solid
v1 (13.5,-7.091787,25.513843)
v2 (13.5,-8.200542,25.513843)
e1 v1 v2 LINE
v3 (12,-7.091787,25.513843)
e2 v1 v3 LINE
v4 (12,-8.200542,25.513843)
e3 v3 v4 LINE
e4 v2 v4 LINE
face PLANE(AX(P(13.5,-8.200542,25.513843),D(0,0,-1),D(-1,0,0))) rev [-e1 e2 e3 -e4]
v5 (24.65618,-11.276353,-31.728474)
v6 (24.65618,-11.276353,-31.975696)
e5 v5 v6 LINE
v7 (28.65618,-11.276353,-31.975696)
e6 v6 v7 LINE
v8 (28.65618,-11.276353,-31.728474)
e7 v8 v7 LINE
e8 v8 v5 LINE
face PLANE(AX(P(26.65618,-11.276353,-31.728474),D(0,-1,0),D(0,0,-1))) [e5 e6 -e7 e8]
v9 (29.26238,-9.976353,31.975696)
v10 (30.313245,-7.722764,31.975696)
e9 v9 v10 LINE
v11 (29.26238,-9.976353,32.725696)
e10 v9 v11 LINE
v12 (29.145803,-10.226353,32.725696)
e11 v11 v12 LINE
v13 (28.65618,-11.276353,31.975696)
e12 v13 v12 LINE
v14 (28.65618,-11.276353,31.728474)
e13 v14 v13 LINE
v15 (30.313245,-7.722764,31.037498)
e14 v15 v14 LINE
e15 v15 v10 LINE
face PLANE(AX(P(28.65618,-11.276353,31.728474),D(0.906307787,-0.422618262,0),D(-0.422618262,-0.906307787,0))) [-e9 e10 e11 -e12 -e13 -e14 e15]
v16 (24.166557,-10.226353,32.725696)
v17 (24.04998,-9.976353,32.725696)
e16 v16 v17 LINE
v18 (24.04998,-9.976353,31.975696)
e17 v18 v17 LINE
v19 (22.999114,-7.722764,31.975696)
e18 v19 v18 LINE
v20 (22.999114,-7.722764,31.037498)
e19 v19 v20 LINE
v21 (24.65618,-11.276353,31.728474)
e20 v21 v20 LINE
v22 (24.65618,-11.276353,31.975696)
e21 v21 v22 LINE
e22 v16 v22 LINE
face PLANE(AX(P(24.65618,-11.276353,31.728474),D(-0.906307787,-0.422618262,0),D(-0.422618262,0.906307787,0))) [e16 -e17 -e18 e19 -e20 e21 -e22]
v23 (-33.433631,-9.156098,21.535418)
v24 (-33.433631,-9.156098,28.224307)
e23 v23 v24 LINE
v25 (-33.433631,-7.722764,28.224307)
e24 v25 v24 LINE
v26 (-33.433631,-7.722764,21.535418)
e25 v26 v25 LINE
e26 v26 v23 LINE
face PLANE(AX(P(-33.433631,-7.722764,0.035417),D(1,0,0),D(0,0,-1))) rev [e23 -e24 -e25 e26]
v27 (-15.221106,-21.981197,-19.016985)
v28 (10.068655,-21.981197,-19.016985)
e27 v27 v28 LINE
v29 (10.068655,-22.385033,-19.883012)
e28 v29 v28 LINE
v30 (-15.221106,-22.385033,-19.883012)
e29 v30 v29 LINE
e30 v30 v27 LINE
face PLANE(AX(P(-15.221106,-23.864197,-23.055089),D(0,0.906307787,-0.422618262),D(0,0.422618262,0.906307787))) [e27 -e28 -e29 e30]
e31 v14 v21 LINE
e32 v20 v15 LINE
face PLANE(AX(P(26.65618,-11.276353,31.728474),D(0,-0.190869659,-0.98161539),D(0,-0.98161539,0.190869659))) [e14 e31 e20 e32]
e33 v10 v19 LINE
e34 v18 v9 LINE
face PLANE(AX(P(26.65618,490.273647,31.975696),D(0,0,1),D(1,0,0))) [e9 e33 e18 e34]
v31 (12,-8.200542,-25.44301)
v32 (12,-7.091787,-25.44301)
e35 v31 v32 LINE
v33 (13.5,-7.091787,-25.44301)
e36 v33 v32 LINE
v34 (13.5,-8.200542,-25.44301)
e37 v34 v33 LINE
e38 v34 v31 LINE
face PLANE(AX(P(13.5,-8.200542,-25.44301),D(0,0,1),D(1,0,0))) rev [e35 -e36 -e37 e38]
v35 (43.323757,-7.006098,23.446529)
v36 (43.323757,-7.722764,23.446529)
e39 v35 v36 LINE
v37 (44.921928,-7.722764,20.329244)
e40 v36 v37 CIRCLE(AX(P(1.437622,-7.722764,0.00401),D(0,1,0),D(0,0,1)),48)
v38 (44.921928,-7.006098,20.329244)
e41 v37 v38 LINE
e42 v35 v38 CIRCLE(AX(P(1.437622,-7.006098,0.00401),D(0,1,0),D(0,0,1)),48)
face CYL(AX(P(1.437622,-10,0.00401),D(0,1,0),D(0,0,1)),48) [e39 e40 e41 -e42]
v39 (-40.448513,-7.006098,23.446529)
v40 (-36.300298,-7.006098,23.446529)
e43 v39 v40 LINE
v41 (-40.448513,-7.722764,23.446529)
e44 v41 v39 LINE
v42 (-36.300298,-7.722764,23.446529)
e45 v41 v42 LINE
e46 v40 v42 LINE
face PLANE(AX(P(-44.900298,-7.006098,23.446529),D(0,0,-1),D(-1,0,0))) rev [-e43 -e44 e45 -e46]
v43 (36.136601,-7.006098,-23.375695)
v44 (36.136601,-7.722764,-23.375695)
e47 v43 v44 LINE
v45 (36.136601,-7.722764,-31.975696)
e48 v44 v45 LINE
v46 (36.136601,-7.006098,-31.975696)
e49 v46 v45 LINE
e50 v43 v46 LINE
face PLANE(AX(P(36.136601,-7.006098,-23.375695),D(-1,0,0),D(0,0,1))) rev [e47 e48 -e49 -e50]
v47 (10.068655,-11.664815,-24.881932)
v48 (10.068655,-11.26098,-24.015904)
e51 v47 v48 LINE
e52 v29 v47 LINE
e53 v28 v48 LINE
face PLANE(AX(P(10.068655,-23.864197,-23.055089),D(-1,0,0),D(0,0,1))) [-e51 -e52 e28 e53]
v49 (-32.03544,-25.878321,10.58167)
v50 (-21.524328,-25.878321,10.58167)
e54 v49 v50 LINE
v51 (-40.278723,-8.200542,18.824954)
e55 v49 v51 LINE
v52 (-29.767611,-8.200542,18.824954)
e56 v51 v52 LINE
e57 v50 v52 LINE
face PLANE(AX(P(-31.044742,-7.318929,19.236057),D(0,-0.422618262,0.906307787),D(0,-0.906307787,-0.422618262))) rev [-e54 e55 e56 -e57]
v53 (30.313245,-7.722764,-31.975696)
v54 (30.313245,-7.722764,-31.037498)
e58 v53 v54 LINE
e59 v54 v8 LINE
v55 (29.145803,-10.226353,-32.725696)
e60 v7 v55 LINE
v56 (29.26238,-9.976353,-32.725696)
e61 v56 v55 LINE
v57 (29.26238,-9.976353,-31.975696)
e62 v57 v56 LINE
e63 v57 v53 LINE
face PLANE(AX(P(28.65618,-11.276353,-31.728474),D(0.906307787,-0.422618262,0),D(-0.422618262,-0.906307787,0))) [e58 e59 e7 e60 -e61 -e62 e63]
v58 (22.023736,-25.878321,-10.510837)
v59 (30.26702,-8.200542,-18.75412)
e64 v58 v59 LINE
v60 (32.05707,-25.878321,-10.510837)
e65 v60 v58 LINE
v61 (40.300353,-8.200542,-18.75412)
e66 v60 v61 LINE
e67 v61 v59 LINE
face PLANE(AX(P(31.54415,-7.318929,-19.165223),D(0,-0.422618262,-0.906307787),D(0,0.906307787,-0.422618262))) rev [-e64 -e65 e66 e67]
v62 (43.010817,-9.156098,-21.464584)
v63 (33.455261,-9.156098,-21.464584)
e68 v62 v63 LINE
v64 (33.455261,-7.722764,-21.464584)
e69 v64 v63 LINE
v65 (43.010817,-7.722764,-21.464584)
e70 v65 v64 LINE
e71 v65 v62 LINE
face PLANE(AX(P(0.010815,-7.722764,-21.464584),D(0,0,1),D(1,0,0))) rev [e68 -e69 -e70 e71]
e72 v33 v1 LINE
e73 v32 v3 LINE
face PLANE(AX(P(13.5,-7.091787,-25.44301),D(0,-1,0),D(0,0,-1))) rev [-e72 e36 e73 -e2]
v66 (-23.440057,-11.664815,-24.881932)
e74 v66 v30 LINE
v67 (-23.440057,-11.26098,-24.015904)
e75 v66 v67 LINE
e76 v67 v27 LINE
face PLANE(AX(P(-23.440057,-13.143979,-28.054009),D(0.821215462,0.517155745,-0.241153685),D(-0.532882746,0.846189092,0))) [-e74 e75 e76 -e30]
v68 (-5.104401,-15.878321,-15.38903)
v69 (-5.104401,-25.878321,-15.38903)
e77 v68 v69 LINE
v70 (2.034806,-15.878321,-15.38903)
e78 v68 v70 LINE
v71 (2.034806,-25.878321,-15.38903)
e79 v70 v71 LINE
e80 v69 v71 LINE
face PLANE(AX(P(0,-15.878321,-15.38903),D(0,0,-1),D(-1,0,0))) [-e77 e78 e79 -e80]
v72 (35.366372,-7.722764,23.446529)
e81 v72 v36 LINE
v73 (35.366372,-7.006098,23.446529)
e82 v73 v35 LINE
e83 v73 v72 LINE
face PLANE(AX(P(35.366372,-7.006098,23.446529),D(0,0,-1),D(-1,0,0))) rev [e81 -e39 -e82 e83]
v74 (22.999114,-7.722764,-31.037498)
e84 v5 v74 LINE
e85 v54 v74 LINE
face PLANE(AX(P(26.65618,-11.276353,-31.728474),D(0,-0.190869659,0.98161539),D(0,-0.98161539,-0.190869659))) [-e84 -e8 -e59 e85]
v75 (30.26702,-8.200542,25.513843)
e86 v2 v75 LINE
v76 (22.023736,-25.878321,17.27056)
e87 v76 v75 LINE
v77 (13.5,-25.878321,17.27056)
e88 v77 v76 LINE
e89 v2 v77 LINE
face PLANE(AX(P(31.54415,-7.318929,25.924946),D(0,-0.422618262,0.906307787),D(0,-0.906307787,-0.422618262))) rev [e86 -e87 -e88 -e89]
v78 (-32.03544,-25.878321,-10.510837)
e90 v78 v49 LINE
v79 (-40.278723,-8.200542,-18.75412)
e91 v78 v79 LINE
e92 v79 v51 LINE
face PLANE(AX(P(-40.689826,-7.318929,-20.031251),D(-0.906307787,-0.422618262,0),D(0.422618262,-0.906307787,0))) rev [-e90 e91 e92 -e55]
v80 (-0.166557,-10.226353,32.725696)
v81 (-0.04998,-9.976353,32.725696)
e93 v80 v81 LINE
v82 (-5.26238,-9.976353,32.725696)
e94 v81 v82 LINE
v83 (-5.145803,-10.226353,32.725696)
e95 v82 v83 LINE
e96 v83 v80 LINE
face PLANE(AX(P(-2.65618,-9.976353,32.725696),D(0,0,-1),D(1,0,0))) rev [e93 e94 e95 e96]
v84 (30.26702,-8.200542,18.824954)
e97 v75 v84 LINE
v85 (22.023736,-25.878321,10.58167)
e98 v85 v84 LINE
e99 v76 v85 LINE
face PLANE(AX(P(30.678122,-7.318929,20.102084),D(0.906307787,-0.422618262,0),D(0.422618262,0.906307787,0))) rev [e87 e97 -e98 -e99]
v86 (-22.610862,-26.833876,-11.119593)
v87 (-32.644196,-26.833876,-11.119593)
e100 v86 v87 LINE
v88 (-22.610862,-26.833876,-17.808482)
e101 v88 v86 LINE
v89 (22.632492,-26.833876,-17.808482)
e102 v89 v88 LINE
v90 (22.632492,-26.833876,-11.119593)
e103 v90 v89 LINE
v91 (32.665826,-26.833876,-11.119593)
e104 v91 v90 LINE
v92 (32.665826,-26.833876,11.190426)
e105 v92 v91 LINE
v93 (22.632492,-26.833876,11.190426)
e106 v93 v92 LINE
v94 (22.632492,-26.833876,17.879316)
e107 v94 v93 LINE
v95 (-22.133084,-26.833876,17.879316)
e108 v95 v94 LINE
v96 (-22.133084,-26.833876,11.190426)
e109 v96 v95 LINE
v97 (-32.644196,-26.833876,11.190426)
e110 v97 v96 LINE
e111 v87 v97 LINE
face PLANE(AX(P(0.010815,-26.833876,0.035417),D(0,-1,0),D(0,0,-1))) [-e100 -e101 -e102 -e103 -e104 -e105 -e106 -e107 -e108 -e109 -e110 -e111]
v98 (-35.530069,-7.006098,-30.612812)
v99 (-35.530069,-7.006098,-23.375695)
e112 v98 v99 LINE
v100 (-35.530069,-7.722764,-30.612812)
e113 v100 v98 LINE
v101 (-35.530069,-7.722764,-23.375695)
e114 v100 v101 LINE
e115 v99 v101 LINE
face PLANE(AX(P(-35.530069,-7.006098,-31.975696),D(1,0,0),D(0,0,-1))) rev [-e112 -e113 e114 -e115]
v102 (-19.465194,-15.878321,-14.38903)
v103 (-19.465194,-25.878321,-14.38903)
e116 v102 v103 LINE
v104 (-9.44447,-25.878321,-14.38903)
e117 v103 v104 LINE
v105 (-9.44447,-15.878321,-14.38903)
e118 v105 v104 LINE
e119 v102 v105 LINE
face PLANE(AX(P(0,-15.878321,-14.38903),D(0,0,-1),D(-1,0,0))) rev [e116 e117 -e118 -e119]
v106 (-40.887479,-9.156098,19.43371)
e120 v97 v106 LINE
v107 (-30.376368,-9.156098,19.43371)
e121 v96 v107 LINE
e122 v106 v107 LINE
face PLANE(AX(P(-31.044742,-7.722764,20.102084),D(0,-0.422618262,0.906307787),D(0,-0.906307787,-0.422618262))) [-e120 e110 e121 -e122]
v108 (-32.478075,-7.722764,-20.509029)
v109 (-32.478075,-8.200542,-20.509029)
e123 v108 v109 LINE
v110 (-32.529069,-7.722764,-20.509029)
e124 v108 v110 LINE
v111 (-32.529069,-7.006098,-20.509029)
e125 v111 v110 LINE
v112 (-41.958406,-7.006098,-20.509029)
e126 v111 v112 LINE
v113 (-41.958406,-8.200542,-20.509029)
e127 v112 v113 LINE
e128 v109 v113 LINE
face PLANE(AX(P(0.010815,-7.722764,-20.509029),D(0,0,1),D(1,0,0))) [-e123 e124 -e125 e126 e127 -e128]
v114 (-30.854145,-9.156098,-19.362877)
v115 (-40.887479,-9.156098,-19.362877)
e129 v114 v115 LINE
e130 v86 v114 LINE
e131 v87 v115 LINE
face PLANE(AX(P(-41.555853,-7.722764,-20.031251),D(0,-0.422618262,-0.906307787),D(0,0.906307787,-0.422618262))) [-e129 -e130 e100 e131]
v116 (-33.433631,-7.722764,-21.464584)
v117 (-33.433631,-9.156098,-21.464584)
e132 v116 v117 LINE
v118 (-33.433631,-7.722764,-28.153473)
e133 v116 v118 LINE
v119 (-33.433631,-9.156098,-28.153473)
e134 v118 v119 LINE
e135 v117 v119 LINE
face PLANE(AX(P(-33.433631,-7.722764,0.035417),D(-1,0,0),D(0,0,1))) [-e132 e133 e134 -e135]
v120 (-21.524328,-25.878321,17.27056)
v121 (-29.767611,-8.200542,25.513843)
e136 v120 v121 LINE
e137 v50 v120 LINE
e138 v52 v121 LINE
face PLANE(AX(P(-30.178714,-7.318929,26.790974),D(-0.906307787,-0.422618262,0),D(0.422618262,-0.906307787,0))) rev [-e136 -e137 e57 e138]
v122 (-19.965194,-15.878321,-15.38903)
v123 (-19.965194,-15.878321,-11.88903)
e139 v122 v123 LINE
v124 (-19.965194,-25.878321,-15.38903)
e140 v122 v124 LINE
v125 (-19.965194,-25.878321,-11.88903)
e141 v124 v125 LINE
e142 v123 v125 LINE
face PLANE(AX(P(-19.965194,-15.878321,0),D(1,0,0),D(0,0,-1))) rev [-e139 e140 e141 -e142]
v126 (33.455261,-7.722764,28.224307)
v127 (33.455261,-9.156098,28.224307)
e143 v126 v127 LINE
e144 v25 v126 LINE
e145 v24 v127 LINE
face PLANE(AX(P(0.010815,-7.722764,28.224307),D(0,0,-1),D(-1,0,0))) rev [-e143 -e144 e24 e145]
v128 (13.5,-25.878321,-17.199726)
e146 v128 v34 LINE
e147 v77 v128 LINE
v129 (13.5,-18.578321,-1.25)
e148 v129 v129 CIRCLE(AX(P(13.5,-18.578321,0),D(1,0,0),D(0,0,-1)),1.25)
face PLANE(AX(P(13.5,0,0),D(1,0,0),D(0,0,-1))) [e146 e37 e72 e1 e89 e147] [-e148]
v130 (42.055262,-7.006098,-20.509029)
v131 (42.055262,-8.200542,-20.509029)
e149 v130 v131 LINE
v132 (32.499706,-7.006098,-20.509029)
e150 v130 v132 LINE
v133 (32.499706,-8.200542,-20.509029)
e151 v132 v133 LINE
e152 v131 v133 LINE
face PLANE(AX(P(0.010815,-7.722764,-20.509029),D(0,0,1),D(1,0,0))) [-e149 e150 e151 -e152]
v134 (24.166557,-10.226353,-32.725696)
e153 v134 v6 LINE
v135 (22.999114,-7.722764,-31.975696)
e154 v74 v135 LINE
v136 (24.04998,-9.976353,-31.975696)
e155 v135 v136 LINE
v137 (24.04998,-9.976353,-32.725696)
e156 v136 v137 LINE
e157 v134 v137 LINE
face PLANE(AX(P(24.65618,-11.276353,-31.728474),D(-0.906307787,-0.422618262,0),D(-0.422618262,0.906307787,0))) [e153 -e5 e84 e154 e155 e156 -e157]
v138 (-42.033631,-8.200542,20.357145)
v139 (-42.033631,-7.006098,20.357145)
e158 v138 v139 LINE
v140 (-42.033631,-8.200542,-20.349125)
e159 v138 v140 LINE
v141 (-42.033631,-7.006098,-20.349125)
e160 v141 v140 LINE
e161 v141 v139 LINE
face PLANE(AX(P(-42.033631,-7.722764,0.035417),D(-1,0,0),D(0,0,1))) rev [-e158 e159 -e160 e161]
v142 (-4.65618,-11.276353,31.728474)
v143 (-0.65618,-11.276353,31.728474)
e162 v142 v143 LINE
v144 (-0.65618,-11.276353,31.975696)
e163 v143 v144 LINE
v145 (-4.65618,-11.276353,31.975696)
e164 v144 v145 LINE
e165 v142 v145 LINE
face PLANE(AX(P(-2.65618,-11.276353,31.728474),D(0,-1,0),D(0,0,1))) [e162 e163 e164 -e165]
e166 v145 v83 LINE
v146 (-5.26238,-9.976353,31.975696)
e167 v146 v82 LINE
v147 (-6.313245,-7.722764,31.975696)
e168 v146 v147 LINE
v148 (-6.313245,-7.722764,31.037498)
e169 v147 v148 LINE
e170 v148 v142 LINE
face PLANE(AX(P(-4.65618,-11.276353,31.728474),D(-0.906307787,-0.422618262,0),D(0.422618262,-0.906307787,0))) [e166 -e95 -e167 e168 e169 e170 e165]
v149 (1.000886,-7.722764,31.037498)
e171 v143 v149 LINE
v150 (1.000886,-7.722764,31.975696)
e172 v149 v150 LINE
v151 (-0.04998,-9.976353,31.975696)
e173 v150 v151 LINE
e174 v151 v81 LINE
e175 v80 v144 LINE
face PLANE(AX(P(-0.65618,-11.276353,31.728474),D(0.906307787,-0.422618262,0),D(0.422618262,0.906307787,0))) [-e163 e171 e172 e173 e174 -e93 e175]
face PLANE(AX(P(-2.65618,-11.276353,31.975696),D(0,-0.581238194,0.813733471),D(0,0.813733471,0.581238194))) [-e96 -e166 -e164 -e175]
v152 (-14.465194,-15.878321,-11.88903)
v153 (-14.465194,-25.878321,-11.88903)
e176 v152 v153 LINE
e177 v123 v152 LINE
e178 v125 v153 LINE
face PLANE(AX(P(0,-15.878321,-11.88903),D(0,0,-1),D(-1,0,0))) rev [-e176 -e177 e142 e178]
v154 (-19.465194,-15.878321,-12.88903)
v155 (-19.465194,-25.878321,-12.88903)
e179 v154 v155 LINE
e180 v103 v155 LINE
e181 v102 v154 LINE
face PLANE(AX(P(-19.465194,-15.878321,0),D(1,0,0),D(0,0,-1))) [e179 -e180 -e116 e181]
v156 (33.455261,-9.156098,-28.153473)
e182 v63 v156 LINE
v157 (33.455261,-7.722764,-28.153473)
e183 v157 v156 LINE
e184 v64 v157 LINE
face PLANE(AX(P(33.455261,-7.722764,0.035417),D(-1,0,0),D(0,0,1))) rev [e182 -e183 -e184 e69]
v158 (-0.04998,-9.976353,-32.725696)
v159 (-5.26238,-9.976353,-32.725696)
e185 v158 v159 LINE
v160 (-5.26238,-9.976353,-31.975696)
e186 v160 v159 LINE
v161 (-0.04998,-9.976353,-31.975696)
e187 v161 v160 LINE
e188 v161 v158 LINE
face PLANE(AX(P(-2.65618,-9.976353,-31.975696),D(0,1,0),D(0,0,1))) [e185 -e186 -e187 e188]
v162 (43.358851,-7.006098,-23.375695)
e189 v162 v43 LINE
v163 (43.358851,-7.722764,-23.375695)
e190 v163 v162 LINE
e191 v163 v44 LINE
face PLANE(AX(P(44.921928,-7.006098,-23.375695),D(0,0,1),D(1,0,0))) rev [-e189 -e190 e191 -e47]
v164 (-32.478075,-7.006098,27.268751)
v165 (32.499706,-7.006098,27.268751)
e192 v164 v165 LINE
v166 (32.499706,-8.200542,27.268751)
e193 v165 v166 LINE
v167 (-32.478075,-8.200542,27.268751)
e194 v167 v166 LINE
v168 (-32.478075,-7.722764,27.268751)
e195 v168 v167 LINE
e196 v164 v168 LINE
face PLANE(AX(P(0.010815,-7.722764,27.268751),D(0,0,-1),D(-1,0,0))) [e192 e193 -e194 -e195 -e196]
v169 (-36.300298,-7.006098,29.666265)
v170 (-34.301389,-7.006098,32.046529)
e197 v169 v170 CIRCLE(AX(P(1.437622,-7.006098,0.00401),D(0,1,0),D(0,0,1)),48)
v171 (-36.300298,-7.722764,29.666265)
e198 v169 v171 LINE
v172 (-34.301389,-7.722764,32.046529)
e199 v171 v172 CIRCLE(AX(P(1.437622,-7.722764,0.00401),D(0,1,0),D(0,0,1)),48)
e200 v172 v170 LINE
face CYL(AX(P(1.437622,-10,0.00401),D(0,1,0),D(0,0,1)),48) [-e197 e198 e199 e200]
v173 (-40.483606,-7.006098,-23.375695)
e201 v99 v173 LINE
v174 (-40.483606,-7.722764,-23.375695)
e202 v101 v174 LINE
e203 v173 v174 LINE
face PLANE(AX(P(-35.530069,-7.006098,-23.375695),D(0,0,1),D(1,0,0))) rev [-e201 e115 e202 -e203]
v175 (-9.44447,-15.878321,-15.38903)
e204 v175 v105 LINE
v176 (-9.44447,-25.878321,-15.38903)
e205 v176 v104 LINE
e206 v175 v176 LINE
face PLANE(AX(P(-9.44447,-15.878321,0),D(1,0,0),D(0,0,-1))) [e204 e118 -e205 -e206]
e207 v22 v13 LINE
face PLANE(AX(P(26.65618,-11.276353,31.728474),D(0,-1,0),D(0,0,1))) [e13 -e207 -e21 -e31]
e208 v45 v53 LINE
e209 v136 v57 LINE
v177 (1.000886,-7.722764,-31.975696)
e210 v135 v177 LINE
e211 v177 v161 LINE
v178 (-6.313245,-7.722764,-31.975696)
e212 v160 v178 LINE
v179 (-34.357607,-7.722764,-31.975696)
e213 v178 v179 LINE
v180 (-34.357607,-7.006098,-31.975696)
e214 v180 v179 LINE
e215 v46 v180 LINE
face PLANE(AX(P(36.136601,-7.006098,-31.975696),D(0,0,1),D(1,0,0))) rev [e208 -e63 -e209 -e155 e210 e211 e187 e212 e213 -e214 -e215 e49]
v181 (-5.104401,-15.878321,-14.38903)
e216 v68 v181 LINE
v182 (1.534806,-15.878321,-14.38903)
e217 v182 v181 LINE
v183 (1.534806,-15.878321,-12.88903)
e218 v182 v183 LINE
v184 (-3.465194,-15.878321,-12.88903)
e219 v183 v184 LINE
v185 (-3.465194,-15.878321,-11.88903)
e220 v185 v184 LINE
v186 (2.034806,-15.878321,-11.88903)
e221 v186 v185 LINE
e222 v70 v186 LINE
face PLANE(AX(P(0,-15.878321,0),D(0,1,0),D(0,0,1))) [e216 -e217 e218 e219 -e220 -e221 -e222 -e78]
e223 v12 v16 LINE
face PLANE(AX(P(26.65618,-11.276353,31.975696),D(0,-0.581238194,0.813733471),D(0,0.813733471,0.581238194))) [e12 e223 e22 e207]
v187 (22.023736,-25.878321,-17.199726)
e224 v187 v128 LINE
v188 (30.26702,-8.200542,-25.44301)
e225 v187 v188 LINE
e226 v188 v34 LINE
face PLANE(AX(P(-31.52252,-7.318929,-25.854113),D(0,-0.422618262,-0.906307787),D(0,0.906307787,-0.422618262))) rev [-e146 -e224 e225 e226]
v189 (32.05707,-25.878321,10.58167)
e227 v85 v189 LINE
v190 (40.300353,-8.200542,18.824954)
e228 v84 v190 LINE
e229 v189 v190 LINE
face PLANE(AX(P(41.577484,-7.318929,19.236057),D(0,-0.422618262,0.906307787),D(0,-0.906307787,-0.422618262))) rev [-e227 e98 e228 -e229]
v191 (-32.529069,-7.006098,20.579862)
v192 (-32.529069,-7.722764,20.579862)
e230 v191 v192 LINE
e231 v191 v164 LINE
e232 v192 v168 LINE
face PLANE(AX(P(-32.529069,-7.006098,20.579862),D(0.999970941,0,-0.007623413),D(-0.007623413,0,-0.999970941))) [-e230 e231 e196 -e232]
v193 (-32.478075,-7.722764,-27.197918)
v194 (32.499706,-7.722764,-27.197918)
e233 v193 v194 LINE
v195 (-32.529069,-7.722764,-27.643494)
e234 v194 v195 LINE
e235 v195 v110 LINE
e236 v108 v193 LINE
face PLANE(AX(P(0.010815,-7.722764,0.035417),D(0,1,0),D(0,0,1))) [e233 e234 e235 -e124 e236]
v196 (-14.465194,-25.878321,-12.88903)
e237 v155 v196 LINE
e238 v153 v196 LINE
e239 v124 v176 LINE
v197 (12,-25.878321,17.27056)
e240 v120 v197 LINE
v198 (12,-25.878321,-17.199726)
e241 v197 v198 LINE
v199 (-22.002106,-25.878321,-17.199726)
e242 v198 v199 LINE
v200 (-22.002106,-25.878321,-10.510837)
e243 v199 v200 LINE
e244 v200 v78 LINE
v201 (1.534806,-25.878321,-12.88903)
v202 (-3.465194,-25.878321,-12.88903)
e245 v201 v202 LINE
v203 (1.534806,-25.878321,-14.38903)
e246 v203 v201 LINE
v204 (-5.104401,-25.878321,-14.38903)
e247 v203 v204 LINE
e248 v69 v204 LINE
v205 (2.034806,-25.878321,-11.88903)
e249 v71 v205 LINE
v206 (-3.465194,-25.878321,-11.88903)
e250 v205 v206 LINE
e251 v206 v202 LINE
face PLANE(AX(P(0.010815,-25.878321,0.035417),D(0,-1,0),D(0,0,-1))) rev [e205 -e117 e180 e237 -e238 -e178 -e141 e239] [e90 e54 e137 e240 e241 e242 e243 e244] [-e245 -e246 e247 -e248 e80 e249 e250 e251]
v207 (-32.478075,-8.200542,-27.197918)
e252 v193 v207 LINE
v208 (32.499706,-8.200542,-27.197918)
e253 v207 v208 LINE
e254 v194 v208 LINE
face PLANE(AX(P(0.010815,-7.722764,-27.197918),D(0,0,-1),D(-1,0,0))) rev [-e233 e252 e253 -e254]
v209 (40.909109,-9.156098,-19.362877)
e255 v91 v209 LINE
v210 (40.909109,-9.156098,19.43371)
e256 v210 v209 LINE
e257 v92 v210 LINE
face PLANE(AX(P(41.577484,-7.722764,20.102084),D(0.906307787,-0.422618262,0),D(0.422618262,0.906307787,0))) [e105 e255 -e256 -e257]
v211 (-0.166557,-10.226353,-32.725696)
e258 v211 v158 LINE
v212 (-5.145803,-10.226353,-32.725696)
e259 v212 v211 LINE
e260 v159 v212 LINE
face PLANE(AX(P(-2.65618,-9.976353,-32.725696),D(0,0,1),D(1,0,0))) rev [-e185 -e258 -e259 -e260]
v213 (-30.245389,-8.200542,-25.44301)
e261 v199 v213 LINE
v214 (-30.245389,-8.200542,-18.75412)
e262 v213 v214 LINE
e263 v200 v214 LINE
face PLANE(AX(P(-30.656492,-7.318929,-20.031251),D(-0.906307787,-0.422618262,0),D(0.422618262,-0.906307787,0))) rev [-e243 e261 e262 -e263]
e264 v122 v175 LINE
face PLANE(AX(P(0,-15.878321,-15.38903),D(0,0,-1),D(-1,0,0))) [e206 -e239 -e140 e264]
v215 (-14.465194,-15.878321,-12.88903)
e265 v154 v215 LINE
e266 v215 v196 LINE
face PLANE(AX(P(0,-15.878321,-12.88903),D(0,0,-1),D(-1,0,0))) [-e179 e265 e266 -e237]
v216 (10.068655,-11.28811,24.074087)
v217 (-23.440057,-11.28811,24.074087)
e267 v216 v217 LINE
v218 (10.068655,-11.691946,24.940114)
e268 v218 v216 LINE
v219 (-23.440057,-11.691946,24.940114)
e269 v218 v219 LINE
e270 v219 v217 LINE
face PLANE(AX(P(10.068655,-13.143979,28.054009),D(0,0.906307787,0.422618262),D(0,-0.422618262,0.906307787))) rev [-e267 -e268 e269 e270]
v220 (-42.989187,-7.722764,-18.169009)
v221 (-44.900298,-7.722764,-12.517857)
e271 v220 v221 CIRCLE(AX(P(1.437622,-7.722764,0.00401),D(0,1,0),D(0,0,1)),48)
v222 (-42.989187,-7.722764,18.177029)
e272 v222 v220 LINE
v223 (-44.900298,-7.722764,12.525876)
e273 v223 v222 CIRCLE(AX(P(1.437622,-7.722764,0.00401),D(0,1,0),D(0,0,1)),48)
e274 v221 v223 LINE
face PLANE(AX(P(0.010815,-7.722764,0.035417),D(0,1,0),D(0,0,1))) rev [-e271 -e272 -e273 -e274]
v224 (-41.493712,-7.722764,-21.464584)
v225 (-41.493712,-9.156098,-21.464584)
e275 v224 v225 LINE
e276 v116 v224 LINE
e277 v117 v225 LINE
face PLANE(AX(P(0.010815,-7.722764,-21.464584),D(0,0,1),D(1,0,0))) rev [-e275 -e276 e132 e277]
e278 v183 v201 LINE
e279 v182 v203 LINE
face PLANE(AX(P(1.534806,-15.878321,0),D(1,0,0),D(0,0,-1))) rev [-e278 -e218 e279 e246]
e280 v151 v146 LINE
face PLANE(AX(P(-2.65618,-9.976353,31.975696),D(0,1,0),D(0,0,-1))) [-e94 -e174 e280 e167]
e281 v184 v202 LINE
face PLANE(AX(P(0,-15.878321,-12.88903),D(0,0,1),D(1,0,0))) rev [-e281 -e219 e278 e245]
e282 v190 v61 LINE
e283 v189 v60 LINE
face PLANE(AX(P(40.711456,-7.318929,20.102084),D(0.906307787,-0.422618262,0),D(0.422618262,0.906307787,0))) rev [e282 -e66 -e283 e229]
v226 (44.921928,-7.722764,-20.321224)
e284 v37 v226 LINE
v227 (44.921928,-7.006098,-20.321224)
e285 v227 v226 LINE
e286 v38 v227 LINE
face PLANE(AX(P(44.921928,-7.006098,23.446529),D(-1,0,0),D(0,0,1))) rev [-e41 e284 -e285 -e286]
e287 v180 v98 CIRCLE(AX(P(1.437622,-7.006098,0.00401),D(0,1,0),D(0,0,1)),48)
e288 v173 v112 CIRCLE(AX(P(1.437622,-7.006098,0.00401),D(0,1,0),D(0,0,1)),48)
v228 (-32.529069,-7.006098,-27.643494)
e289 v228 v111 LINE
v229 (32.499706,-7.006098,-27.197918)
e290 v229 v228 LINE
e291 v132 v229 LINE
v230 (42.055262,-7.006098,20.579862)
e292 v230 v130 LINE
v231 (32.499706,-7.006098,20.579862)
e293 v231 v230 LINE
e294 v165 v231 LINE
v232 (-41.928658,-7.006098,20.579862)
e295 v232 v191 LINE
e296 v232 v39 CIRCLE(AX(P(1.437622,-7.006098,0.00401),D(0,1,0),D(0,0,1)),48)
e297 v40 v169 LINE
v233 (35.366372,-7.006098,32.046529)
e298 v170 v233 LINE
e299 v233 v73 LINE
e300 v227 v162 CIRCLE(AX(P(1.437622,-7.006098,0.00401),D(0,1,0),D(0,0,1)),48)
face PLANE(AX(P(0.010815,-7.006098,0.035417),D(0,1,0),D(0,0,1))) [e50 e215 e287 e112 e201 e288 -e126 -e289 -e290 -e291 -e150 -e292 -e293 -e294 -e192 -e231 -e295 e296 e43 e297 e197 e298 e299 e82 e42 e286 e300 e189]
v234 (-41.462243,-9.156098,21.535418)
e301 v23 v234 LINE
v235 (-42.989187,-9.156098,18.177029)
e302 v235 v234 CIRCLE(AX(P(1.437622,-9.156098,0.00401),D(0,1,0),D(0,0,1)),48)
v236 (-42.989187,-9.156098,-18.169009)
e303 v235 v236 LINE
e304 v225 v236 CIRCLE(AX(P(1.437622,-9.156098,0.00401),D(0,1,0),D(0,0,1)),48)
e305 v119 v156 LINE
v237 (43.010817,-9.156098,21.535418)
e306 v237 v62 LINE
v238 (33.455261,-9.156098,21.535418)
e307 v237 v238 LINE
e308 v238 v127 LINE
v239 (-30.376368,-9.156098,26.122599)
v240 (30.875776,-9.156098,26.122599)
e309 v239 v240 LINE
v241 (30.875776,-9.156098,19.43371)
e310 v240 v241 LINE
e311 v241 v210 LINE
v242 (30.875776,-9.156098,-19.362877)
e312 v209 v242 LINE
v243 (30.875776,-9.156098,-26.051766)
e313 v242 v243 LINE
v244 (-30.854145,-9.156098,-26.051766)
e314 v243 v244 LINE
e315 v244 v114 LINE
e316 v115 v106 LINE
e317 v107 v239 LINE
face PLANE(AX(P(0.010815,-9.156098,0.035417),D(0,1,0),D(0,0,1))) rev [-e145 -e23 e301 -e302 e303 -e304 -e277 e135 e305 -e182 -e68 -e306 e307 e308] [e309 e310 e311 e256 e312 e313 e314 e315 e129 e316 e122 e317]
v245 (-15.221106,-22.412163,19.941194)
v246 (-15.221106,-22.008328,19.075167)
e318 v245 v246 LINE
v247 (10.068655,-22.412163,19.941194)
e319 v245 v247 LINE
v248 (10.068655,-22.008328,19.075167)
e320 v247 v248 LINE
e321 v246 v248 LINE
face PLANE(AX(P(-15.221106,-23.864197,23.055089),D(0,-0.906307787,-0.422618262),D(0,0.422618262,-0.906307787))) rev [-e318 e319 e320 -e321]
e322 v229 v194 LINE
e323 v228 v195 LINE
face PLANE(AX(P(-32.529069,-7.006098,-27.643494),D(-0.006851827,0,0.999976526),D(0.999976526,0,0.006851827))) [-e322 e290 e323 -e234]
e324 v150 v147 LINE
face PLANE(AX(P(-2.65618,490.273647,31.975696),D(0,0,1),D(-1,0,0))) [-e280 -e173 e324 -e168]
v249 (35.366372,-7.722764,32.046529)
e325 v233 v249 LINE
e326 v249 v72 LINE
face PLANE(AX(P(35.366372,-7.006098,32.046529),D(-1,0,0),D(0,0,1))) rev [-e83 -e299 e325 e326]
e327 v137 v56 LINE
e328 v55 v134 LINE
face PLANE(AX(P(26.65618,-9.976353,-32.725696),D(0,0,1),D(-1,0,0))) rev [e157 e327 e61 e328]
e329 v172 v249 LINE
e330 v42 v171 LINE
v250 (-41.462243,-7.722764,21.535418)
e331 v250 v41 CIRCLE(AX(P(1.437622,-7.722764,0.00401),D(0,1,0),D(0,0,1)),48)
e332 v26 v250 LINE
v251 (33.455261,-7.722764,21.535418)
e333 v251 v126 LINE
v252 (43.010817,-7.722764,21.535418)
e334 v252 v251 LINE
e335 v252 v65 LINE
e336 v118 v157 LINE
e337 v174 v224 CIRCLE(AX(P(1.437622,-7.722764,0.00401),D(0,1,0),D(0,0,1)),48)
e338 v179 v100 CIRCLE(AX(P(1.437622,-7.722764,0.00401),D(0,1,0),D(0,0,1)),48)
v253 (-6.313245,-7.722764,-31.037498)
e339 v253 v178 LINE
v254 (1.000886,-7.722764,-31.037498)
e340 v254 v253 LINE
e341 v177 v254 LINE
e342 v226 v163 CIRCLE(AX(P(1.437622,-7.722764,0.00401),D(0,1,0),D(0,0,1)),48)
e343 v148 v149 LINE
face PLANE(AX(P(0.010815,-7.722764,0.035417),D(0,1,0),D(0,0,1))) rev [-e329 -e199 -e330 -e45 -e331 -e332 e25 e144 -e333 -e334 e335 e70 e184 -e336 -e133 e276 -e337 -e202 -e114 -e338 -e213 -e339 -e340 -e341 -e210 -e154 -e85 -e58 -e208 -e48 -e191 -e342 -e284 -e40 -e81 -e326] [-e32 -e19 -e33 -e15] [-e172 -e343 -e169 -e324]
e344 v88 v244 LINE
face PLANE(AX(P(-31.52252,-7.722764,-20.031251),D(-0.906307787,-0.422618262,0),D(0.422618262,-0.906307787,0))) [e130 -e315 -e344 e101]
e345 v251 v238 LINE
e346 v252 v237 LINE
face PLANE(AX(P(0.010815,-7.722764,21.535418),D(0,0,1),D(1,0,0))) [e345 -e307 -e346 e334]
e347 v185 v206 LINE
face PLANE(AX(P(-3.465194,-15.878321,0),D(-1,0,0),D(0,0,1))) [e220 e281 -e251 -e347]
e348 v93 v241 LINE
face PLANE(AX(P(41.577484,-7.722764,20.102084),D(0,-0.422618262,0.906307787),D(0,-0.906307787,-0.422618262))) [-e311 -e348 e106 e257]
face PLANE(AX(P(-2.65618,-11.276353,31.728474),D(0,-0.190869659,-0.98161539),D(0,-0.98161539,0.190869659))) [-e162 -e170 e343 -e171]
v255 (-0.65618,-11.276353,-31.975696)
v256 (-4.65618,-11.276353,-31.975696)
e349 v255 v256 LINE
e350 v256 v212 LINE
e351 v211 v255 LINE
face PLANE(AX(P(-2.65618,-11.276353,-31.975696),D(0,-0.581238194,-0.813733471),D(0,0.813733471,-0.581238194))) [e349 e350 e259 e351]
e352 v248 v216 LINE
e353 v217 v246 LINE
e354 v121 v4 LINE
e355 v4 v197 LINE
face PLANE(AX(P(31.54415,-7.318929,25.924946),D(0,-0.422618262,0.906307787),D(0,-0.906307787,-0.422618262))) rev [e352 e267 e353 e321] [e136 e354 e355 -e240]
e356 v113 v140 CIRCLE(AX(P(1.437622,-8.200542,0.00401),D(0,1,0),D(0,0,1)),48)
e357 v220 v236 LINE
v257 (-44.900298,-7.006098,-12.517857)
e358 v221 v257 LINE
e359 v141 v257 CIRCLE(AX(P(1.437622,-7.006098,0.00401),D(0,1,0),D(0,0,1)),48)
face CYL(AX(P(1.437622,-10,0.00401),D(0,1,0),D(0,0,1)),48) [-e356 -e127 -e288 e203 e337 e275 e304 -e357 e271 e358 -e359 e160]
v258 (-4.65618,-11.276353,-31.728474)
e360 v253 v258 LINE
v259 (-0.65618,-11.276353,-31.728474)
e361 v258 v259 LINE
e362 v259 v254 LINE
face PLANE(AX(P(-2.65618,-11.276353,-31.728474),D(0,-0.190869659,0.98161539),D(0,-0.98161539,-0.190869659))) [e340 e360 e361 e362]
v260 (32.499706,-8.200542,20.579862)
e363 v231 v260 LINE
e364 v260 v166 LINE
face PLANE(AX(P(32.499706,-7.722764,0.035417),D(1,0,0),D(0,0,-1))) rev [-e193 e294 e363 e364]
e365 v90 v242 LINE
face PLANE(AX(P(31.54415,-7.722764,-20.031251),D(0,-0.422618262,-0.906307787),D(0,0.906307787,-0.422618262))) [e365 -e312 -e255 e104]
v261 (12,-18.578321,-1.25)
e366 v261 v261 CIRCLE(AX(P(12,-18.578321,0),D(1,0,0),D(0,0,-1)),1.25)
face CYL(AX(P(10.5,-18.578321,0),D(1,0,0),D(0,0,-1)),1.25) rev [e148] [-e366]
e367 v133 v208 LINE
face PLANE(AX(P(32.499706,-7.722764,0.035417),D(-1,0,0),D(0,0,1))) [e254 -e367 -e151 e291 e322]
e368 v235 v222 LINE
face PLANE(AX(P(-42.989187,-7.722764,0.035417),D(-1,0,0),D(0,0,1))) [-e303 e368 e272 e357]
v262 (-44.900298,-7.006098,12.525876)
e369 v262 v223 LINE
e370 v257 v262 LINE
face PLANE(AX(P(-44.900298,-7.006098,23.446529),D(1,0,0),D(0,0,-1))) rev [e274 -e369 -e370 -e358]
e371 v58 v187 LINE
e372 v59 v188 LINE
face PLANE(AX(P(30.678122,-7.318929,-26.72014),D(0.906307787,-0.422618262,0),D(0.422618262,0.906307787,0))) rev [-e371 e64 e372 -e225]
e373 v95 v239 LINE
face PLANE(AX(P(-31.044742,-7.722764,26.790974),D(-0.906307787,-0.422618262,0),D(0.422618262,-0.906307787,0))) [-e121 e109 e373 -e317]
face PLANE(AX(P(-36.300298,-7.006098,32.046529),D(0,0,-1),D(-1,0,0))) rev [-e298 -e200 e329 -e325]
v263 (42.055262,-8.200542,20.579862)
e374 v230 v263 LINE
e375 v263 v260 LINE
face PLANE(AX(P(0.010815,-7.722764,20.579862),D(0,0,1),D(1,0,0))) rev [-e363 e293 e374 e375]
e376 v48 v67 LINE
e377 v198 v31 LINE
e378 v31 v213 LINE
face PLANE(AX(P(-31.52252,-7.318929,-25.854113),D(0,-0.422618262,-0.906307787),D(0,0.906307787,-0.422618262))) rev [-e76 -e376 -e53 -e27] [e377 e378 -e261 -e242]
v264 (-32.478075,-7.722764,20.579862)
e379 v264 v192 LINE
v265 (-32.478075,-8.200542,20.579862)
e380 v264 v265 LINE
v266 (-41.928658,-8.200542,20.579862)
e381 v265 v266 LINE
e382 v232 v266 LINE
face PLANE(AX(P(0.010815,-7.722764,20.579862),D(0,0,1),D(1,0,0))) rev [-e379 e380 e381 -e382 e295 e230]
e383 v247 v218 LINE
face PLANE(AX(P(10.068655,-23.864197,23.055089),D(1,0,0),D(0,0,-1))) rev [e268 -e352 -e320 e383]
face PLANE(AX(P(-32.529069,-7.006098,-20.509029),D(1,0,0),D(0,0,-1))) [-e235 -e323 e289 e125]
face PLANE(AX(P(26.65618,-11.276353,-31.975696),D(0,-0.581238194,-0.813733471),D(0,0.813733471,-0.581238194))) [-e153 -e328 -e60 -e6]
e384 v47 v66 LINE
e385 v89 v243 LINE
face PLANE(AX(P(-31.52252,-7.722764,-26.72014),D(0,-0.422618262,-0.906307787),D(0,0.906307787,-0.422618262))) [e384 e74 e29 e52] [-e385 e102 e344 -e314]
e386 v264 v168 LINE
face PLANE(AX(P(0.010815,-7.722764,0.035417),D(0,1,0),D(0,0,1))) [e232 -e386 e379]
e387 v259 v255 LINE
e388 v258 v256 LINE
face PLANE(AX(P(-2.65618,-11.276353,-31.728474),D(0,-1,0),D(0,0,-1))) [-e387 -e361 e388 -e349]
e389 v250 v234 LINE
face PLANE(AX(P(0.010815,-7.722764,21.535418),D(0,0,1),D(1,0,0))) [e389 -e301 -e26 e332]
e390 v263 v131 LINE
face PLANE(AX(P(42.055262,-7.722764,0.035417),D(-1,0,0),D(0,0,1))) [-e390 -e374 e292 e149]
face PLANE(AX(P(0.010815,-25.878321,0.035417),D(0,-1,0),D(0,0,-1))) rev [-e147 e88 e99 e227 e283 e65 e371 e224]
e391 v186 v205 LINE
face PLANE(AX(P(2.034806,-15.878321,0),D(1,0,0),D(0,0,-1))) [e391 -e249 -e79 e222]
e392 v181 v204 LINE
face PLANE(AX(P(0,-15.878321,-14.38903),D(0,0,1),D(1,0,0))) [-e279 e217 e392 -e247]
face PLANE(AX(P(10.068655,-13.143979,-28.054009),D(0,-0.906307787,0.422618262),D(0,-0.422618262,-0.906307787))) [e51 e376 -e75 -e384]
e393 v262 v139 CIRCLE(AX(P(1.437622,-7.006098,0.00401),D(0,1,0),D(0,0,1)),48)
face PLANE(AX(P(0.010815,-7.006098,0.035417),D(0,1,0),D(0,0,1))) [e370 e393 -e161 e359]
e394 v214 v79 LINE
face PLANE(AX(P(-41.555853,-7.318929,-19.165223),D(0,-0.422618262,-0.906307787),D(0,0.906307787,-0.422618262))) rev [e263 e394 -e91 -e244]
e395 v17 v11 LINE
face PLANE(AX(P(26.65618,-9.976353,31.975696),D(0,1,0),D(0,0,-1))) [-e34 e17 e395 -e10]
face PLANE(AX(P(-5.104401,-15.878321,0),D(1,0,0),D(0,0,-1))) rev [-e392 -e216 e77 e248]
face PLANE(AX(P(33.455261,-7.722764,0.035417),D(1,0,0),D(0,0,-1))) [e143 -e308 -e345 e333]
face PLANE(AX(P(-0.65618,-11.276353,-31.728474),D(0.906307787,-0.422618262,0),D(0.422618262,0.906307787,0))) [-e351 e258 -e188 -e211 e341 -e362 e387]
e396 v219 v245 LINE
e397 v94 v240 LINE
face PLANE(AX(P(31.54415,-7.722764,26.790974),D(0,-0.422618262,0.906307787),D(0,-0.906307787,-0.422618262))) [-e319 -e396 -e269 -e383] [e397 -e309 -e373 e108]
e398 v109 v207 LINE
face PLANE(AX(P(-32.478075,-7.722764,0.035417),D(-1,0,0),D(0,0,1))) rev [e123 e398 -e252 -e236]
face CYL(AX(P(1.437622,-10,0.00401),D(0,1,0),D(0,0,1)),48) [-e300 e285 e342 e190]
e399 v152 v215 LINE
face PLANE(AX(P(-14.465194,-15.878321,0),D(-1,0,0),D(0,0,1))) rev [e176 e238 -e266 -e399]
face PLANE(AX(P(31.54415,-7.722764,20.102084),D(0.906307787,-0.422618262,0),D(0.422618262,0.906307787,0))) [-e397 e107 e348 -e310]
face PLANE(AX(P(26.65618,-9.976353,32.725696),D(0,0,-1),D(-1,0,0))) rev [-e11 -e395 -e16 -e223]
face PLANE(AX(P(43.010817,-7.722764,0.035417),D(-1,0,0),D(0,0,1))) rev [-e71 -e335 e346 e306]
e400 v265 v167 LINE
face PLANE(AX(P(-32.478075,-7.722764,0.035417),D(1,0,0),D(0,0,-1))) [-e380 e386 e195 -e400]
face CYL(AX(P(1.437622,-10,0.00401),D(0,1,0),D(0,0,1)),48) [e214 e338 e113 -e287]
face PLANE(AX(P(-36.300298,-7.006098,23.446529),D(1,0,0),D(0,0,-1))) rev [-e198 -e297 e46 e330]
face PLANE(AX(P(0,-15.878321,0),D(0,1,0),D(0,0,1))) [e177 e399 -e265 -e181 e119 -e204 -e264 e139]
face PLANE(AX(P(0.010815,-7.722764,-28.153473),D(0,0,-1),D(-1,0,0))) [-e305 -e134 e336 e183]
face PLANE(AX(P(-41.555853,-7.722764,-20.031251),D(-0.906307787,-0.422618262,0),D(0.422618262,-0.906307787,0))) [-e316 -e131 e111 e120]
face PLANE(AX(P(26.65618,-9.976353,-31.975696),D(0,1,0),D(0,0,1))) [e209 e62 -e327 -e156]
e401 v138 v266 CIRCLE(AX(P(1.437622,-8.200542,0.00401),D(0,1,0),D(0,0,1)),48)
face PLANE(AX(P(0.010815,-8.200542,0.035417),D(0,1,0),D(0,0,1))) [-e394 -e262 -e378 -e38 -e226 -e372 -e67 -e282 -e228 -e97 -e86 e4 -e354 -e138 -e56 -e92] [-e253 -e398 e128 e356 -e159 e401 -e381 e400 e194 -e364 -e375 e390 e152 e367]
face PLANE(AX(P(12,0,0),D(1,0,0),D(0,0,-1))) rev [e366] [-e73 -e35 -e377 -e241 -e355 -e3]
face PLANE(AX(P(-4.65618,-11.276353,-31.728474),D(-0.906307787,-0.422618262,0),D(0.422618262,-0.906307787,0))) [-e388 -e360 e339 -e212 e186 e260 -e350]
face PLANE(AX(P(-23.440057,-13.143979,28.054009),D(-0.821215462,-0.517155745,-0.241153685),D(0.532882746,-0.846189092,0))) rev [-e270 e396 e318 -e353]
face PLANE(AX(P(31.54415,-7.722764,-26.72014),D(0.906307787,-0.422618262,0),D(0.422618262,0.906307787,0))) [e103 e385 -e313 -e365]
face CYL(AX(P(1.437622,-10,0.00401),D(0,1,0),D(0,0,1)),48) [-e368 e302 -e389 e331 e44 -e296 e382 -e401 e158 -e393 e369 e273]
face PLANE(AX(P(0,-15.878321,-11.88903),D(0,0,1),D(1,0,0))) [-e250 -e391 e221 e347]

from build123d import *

# Parameters (mm, degrees)
SKETCH1_W             = 140
SKETCH1_H             = 14
SKETCH1_W_2           = 180
SKETCH1_H_2           = 90
BOSS_EXTRUDE1_DEPTH   = 3
BOSS_EXTRUDE2_DEPTH   = 40
BOSS_EXTRUDE2_DRAFT   = -25
SHELL1_T              = -2
BOSS_EXTRUDE4_DEPTH   = 1.5
SCALE1_SCALE          = 0.4777778
CUT_EXTRUDE3_START    = -10
CUT_EXTRUDE3_DEPTH    = 4
SNAP_START            = -31.975695848
SNAP_HOOK1_DEPTH      = 0.247222222
SNAP_START_2          = -6.313244992
SNAP_HOOK1_2_DEPTH    = 7.314130886
SNAP_START_3          = -5.262379505
SNAP_HOOK1_3_DEPTH    = 5.212399912
SNAP_START_4          = -34
SNAP_HOOK1_4_DEPTH    = 4
SKETCH16_W            = 5
SKETCH16_H            = 1
SKETCH16_W_2          = 0.5
SKETCH16_H_2          = 3.5
SKETCH16_W_3          = 10.020724484
SKETCH16_W_4          = 6.639207239
BOSS_EXTRUDE5_DEPTH   = 10
CUT_EXTRUDE8_DEPTH    = 3.5
BOSS_EXTRUDE9_DEPTH   = 1.5
MIRROR34_START        = -31.975695848
MIRROR34_COPY_1_DEPTH = 0.247222222
MIRROR34_START_2      = -6.313244992
MIRROR34_COPY_2_DEPTH = 7.314130886
MIRROR34_START_3      = -5.262379505
MIRROR34_COPY_3_DEPTH = 5.212399912
MIRROR34_START_4      = -34
MIRROR34_COPY_4_DEPTH = 4
MIRROR34_COPY_5_DEPTH = 7.314130886
MIRROR34_COPY_6_DEPTH = 5.212399912
MIRROR34_COPY_7_DEPTH = 4
SKETCH32_R            = 1.25
CUT_EXTRUDE9_DEPTH    = 3


with BuildPart() as part:
    # Sketch1 → Boss-Extrude1 (new body)
    with BuildSketch(Plane(origin=(0, 0, 0), x_dir=(1, 0, 0), z_dir=(0, 1, 0))):
        with Locations((0, -52)):
            Rectangle(SKETCH1_W, SKETCH1_H)
        Rectangle(SKETCH1_W_2, SKETCH1_H_2)
        with Locations((0, 52)):
            Rectangle(SKETCH1_W, SKETCH1_H)
    extrude(amount=BOSS_EXTRUDE1_DEPTH)


with BuildPart() as boss_extrude2_tool:
    # Sketch2 → Boss-Extrude2 (with draft: the straight prism first)
    with BuildSketch(Plane(origin=(0, 3, 0), x_dir=(1, 0, 0), z_dir=(0, 1, 0))):
        Polygon((87, -42), (87, 42), (66, 42), (66, 56), (-66, 56), (-66, 42), (-87, 42), (-87, -42), (-65, -42), (-65, -56), (66, -56), (66, -42), align=None)
    extrude(amount=-BOSS_EXTRUDE2_DEPTH)
    # Boss-Extrude2: the draft: its side faces are tilted about the plane it starts from
    boss_extrude2_sides = [boss_extrude2_tool.faces().sort_by_distance(p)[0] for p in [
        (87, -17, 0),
        (76.5, -17, -42),
        (66, -17, -49),
        (0, -17, -56),
        (-66, -17, -49),
        (-76.5, -17, -42),
        (-87, -17, 0),
        (-76, -17, 42),
        (-65, -17, 49),
        (0.5, -17, 56),
        (66, -17, 49),
        (76.5, -17, 42),
    ]]
    draft(boss_extrude2_sides, Plane(origin=(0, 3, 0), x_dir=(1, 0, 0), z_dir=(0, 1, 0)), BOSS_EXTRUDE2_DRAFT)


with BuildPart() as part_1:
    add(part.part)

    # Boss-Extrude2: add boss_extrude2_tool
    add(boss_extrude2_tool.part)

    # Shell1
    shell1_openings = [part_1.faces().sort_by_distance(p)[0] for p in [
        (0, 3, 0),
    ]]
    offset(amount=SHELL1_T, openings=shell1_openings, kind=Kind.INTERSECTION)

    # Sketch6 → Boss-Extrude4 (add)
    with BuildSketch(Plane(origin=(0, 3, 0), x_dir=(1, 0, 0), z_dir=(0, 1, 0))):
        Polygon((94, 49), (75.612106054, 49), (75.612106054, 67), (-74.387893946, 67), (-74.387893946, 49), (-94, 49), (-94, -49), (-76, -49), (-76, -67), (74, -67), (74, -49), (94, -49), align=None)
        Polygon((88, -43), (88, 43), (68, 43), (68, 57), (-68.106730885, 57.932601668), (-68.106730885, 43), (-88, 43), (-88, -43), (-68.106730885, -43), (-68, -57), (68, -57), (68, -43), align=None, mode=Mode.SUBTRACT)
    extrude(amount=BOSS_EXTRUDE4_DEPTH)


with BuildPart() as part_2:
    # Scale1: scaled about (0.020709859, -17.532954153, 0.067819315)
    add(part_1.part.scale(SCALE1_SCALE).moved(Location((0.010815148, -9.15609789, 0.035416752))))

    # Cut-Extrude3: read off the stored shape, not the designer's step
    # Cut-Extrude3 outline → Cut-Extrude3 (cut)
    with BuildSketch(Plane(origin=(0, 0, 0), x_dir=(1, 0, 0), z_dir=(0, 1, 0)).offset(CUT_EXTRUDE3_START)):
        with BuildLine():
            ThreePointArc((-34.301389296, -32.046529352), (-35.32011541, -30.872581639), (-36.300297652, -29.666265387))
            Line((-36.300297652, -29.666265387), (-36.300297652, -32.046529352))
            Line((-36.300297652, -32.046529352), (-34.301389296, -32.046529352))
        make_face()
        with BuildLine():
            Line((-40.483605991, 23.375695448), (-44.900298052, 23.375695448))
            Line((-44.900298052, 23.375695448), (-44.900298052, 12.517856629))
            ThreePointArc((-44.900298052, 12.517856629), (-43.024636929, 18.082103779), (-40.483605991, 23.375695448))
        make_face()
        with BuildLine():
            Line((-35.530069168, 31.975695848), (-35.530069168, 30.612812124))
            ThreePointArc((-35.530069168, 30.612812124), (-34.950219267, 31.299743697), (-34.35760676, 31.975695848))
            Line((-34.35760676, 31.975695848), (-35.530069168, 31.975695848))
        make_face()
        with BuildLine():
            Line((-44.900298052, -12.525876421), (-44.900298052, -23.446528952))
            Line((-44.900298052, -23.446528952), (-40.448512682, -23.446528952))
            ThreePointArc((-40.448512682, -23.446528952), (-43.011068882, -18.123442994), (-44.900298052, -12.525876421))
        make_face()
        with BuildLine():
            Line((44.921928348, -23.446528952), (44.921928348, -20.329243571))
            ThreePointArc((44.921928348, -20.329243571), (44.151290065, -21.90247063), (43.3237572, -23.446528952))
            Line((43.3237572, -23.446528952), (44.921928348, -23.446528952))
        make_face()
        with BuildLine():
            ThreePointArc((43.35885051, 23.375695448), (44.167690984, 21.862430755), (44.921928348, 20.321223779))
            Line((44.921928348, 20.321223779), (44.921928348, 23.375695448))
            Line((44.921928348, 23.375695448), (43.35885051, 23.375695448))
        make_face()
    extrude(amount=CUT_EXTRUDE3_DEPTH, mode=Mode.SUBTRACT)



with BuildPart() as body_2:
    # Snap Hook1: read off the stored shape, not the designer's step
    # Snap Hook1 outline → Snap Hook1 (new body)
    with BuildSketch(Plane.XY.offset(SNAP_START)):
        Polygon((-5.262379505, -9.9763528), (-4.656179549, -11.2763528), (-0.656179549, -11.2763528), (-0.049979593, -9.9763528), align=None)
    snap_hook1 = extrude(amount=SNAP_HOOK1_DEPTH)


with BuildPart() as part_3:
    add(part_2.part)

    add(body_2.part)  # Snap Hook1 2 merges body 2
    # Snap Hook1 2 outline → Snap Hook1 2 (add)
    with BuildSketch(Plane.YZ.offset(SNAP_START_2)):
        Polygon((-9.9763528, -31.975695848), (-7.72276449, -31.975695848), (-7.72276449, -31.037498121), (-11.2763528, -31.728473626), (-9.9763528, -31.728473626), align=None)
    snap_hook1_2 = extrude(amount=SNAP_HOOK1_2_DEPTH)

    # Snap Hook1 3 outline → Snap Hook1 3 (add)
    with BuildSketch(Plane.YZ.offset(SNAP_START_3)):
        Polygon((-9.9763528, -32.725695848), (-9.9763528, -31.975695848), (-11.2763528, -31.975695848), (-10.2263528, -32.725695848), align=None)
    snap_hook1_3 = extrude(amount=SNAP_HOOK1_3_DEPTH)

    # Snap Hook1 4 outline → Snap Hook1 4 (cut)
    with BuildSketch(Plane.XY.offset(SNAP_START_4)):
        Polygon((-6.313244992, -7.72276449), (-6.313244992, -13), (-3.85242966, -13), (-4.656179549, -11.2763528), align=None)
        Polygon((-0.656179549, -11.2763528), (-1.459929438, -13), (1.000885894, -13), (1.000885894, -7.72276449), align=None)
    snap_hook1_4 = extrude(amount=SNAP_HOOK1_4_DEPTH, mode=Mode.SUBTRACT)

    # Sketch16 → Boss-Extrude5 (add)
    with BuildSketch(Plane(origin=(0, -25.87832089, 0), x_dir=(1, 0, 0), z_dir=(0, 1, 0))):
        with Locations((-16.965194138, 12.3890301)):
            Rectangle(SKETCH16_W, SKETCH16_H)
        with Locations((-19.715194138, 13.6390301)):
            Rectangle(SKETCH16_W_2, SKETCH16_H_2)
        with Locations((-14.454831896, 14.8890301)):
            Rectangle(SKETCH16_W_3, SKETCH16_H)
        with Locations((-0.965194138, 12.3890301)):
            Rectangle(SKETCH16_W, SKETCH16_H)
        with Locations((-1.784797758, 14.8890301)):
            Rectangle(SKETCH16_W_4, SKETCH16_H)
        Polygon((2.034805862, 15.3890301), (1.534805862, 15.3890301), (1.534805862, 14.3890301), (1.534805862, 12.8890301), (1.534805862, 11.8890301), (2.034805862, 11.8890301), align=None)
    extrude(amount=BOSS_EXTRUDE5_DEPTH)

    # Mirror17: Snap Hook1, Snap Hook1 2, Snap Hook1 3, Snap Hook1 4 across plane
    add(snap_hook1.mirror(Plane.XY))
    add(snap_hook1_2.mirror(Plane.XY))
    add(snap_hook1_3.mirror(Plane.XY))
    add(snap_hook1_4.mirror(Plane.XY), mode=Mode.SUBTRACT)

    # Sketch28 → Cut-Extrude8 (cut, symmetric)
    with BuildSketch(Plane(origin=(0, -11.613740983, -24.905747912), x_dir=(-1, 0, 0), z_dir=(0, -0.42261826174070033, -0.9063077870366497))):
        Polygon((23.440057223, -0.056353665), (15.221105561, -11.884805387), (-10.068654735, -11.884805387), (-10.068654735, -0.056353665), align=None)
    cut_extrude8 = extrude(amount=CUT_EXTRUDE8_DEPTH, both=True, mode=Mode.SUBTRACT)

    # Mirror33: Cut-Extrude8 across plane
    add(cut_extrude8.mirror(Plane.XY), mode=Mode.SUBTRACT)

    # Sketch31 → Boss-Extrude9 (add)
    with BuildSketch(Plane(origin=(12, 0, 0), x_dir=(0, 0, -1), z_dir=(1, 0, 0))):
        Polygon((-25.513843155, -8.20054229), (-17.270559615, -25.87832089), (17.199726111, -25.87832089), (25.443009652, -8.20054229), (25.443009652, -7.091787122), (-25.513843155, -7.091787122), align=None)
    extrude(amount=BOSS_EXTRUDE9_DEPTH)

    # Mirror34: Snap Hook1, Snap Hook1 2, Snap Hook1 3, Snap Hook1 4 across plane
    add(snap_hook1.mirror(Plane(origin=(12, 0, 0), x_dir=(0, 0, 1), z_dir=(1, 0, 0))))
    add(snap_hook1_2.mirror(Plane(origin=(12, 0, 0), x_dir=(0, 0, 1), z_dir=(1, 0, 0))))
    add(snap_hook1_3.mirror(Plane(origin=(12, 0, 0), x_dir=(0, 0, 1), z_dir=(1, 0, 0))))
    add(snap_hook1_4.mirror(Plane(origin=(12, 0, 0), x_dir=(0, 0, 1), z_dir=(1, 0, 0))), mode=Mode.SUBTRACT)



with BuildPart() as body_2_2:
    # Mirror34 copy 1 sketch → Mirror34 copy 1 (new body)
    with BuildSketch(Plane(origin=(24, 0, 0), x_dir=(-1, 0, 0), z_dir=(0, 0, -1)).offset(MIRROR34_START)):
        Polygon((-5.262379505, -9.9763528), (-4.656179549, -11.2763528), (-0.656179549, -11.2763528), (-0.049979593, -9.9763528), align=None)
    extrude(amount=MIRROR34_COPY_1_DEPTH)


with BuildPart() as part_4:
    add(part_3.part)

    add(body_2_2.part)  # Mirror34 copy 2 merges body 2 2
    # Mirror34 copy 2 sketch → Mirror34 copy 2 (add)
    with BuildSketch(Plane(origin=(24, 0, 0), x_dir=(0, 1, 0), z_dir=(-1, 0, 0)).offset(MIRROR34_START_2)):
        Polygon((-9.9763528, -31.975695848), (-7.72276449, -31.975695848), (-7.72276449, -31.037498121), (-11.2763528, -31.728473626), (-9.9763528, -31.728473626), align=None)
    extrude(amount=MIRROR34_COPY_2_DEPTH)

    # Mirror34 copy 3 sketch → Mirror34 copy 3 (add)
    with BuildSketch(Plane(origin=(24, 0, 0), x_dir=(0, 1, 0), z_dir=(-1, 0, 0)).offset(MIRROR34_START_3)):
        Polygon((-9.9763528, -32.725695848), (-9.9763528, -31.975695848), (-11.2763528, -31.975695848), (-10.2263528, -32.725695848), align=None)
    extrude(amount=MIRROR34_COPY_3_DEPTH)

    # Mirror34 copy 4 sketch → Mirror34 copy 4 (cut)
    with BuildSketch(Plane(origin=(24, 0, 0), x_dir=(-1, 0, 0), z_dir=(0, 0, -1)).offset(MIRROR34_START_4)):
        Polygon((-6.313244992, -7.72276449), (-6.313244992, -13), (-3.85242966, -13), (-4.656179549, -11.2763528), align=None)
        Polygon((-0.656179549, -11.2763528), (-1.459929438, -13), (1.000885894, -13), (1.000885894, -7.72276449), align=None)
    extrude(amount=MIRROR34_COPY_4_DEPTH, mode=Mode.SUBTRACT)

    # Mirror34 copy 5 sketch → Mirror34 copy 5 (add)
    with BuildSketch(Plane(origin=(24, 0, 0), x_dir=(0, 1, 0), z_dir=(-1, 0, 0)).offset(MIRROR34_START_2)):
        Polygon((-9.9763528, 31.975695848), (-7.72276449, 31.975695848), (-7.72276449, 31.037498121), (-11.2763528, 31.728473626), (-9.9763528, 31.728473626), align=None)
    extrude(amount=MIRROR34_COPY_5_DEPTH)

    # Mirror34 copy 6 sketch → Mirror34 copy 6 (add)
    with BuildSketch(Plane(origin=(24, 0, 0), x_dir=(0, 1, 0), z_dir=(-1, 0, 0)).offset(MIRROR34_START_3)):
        Polygon((-9.9763528, 32.725695848), (-9.9763528, 31.975695848), (-11.2763528, 31.975695848), (-10.2263528, 32.725695848), align=None)
    extrude(amount=MIRROR34_COPY_6_DEPTH)

    # Mirror34 copy 7 sketch → Mirror34 copy 7 (cut)
    with BuildSketch(Plane(origin=(24, 0, 0), x_dir=(-1, 0, 0), z_dir=(0, 0, 1)).offset(MIRROR34_START_4)):
        Polygon((-6.313244992, 7.72276449), (-6.313244992, 13), (-3.85242966, 13), (-4.656179549, 11.2763528), align=None)
        Polygon((-0.656179549, 11.2763528), (-1.459929438, 13), (1.000885894, 13), (1.000885894, 7.72276449), align=None)
    extrude(amount=MIRROR34_COPY_7_DEPTH, mode=Mode.SUBTRACT)

    # Sketch32 → Cut-Extrude9 (cut)
    with BuildSketch(Plane(origin=(13.5, 0, 0), x_dir=(0, 0, -1), z_dir=(1, 0, 0))):
        with Locations((0, -18.57832089)):
            Circle(SKETCH32_R)
    extrude(amount=-CUT_EXTRUDE9_DEPTH, mode=Mode.SUBTRACT)


solid = part_4.part
